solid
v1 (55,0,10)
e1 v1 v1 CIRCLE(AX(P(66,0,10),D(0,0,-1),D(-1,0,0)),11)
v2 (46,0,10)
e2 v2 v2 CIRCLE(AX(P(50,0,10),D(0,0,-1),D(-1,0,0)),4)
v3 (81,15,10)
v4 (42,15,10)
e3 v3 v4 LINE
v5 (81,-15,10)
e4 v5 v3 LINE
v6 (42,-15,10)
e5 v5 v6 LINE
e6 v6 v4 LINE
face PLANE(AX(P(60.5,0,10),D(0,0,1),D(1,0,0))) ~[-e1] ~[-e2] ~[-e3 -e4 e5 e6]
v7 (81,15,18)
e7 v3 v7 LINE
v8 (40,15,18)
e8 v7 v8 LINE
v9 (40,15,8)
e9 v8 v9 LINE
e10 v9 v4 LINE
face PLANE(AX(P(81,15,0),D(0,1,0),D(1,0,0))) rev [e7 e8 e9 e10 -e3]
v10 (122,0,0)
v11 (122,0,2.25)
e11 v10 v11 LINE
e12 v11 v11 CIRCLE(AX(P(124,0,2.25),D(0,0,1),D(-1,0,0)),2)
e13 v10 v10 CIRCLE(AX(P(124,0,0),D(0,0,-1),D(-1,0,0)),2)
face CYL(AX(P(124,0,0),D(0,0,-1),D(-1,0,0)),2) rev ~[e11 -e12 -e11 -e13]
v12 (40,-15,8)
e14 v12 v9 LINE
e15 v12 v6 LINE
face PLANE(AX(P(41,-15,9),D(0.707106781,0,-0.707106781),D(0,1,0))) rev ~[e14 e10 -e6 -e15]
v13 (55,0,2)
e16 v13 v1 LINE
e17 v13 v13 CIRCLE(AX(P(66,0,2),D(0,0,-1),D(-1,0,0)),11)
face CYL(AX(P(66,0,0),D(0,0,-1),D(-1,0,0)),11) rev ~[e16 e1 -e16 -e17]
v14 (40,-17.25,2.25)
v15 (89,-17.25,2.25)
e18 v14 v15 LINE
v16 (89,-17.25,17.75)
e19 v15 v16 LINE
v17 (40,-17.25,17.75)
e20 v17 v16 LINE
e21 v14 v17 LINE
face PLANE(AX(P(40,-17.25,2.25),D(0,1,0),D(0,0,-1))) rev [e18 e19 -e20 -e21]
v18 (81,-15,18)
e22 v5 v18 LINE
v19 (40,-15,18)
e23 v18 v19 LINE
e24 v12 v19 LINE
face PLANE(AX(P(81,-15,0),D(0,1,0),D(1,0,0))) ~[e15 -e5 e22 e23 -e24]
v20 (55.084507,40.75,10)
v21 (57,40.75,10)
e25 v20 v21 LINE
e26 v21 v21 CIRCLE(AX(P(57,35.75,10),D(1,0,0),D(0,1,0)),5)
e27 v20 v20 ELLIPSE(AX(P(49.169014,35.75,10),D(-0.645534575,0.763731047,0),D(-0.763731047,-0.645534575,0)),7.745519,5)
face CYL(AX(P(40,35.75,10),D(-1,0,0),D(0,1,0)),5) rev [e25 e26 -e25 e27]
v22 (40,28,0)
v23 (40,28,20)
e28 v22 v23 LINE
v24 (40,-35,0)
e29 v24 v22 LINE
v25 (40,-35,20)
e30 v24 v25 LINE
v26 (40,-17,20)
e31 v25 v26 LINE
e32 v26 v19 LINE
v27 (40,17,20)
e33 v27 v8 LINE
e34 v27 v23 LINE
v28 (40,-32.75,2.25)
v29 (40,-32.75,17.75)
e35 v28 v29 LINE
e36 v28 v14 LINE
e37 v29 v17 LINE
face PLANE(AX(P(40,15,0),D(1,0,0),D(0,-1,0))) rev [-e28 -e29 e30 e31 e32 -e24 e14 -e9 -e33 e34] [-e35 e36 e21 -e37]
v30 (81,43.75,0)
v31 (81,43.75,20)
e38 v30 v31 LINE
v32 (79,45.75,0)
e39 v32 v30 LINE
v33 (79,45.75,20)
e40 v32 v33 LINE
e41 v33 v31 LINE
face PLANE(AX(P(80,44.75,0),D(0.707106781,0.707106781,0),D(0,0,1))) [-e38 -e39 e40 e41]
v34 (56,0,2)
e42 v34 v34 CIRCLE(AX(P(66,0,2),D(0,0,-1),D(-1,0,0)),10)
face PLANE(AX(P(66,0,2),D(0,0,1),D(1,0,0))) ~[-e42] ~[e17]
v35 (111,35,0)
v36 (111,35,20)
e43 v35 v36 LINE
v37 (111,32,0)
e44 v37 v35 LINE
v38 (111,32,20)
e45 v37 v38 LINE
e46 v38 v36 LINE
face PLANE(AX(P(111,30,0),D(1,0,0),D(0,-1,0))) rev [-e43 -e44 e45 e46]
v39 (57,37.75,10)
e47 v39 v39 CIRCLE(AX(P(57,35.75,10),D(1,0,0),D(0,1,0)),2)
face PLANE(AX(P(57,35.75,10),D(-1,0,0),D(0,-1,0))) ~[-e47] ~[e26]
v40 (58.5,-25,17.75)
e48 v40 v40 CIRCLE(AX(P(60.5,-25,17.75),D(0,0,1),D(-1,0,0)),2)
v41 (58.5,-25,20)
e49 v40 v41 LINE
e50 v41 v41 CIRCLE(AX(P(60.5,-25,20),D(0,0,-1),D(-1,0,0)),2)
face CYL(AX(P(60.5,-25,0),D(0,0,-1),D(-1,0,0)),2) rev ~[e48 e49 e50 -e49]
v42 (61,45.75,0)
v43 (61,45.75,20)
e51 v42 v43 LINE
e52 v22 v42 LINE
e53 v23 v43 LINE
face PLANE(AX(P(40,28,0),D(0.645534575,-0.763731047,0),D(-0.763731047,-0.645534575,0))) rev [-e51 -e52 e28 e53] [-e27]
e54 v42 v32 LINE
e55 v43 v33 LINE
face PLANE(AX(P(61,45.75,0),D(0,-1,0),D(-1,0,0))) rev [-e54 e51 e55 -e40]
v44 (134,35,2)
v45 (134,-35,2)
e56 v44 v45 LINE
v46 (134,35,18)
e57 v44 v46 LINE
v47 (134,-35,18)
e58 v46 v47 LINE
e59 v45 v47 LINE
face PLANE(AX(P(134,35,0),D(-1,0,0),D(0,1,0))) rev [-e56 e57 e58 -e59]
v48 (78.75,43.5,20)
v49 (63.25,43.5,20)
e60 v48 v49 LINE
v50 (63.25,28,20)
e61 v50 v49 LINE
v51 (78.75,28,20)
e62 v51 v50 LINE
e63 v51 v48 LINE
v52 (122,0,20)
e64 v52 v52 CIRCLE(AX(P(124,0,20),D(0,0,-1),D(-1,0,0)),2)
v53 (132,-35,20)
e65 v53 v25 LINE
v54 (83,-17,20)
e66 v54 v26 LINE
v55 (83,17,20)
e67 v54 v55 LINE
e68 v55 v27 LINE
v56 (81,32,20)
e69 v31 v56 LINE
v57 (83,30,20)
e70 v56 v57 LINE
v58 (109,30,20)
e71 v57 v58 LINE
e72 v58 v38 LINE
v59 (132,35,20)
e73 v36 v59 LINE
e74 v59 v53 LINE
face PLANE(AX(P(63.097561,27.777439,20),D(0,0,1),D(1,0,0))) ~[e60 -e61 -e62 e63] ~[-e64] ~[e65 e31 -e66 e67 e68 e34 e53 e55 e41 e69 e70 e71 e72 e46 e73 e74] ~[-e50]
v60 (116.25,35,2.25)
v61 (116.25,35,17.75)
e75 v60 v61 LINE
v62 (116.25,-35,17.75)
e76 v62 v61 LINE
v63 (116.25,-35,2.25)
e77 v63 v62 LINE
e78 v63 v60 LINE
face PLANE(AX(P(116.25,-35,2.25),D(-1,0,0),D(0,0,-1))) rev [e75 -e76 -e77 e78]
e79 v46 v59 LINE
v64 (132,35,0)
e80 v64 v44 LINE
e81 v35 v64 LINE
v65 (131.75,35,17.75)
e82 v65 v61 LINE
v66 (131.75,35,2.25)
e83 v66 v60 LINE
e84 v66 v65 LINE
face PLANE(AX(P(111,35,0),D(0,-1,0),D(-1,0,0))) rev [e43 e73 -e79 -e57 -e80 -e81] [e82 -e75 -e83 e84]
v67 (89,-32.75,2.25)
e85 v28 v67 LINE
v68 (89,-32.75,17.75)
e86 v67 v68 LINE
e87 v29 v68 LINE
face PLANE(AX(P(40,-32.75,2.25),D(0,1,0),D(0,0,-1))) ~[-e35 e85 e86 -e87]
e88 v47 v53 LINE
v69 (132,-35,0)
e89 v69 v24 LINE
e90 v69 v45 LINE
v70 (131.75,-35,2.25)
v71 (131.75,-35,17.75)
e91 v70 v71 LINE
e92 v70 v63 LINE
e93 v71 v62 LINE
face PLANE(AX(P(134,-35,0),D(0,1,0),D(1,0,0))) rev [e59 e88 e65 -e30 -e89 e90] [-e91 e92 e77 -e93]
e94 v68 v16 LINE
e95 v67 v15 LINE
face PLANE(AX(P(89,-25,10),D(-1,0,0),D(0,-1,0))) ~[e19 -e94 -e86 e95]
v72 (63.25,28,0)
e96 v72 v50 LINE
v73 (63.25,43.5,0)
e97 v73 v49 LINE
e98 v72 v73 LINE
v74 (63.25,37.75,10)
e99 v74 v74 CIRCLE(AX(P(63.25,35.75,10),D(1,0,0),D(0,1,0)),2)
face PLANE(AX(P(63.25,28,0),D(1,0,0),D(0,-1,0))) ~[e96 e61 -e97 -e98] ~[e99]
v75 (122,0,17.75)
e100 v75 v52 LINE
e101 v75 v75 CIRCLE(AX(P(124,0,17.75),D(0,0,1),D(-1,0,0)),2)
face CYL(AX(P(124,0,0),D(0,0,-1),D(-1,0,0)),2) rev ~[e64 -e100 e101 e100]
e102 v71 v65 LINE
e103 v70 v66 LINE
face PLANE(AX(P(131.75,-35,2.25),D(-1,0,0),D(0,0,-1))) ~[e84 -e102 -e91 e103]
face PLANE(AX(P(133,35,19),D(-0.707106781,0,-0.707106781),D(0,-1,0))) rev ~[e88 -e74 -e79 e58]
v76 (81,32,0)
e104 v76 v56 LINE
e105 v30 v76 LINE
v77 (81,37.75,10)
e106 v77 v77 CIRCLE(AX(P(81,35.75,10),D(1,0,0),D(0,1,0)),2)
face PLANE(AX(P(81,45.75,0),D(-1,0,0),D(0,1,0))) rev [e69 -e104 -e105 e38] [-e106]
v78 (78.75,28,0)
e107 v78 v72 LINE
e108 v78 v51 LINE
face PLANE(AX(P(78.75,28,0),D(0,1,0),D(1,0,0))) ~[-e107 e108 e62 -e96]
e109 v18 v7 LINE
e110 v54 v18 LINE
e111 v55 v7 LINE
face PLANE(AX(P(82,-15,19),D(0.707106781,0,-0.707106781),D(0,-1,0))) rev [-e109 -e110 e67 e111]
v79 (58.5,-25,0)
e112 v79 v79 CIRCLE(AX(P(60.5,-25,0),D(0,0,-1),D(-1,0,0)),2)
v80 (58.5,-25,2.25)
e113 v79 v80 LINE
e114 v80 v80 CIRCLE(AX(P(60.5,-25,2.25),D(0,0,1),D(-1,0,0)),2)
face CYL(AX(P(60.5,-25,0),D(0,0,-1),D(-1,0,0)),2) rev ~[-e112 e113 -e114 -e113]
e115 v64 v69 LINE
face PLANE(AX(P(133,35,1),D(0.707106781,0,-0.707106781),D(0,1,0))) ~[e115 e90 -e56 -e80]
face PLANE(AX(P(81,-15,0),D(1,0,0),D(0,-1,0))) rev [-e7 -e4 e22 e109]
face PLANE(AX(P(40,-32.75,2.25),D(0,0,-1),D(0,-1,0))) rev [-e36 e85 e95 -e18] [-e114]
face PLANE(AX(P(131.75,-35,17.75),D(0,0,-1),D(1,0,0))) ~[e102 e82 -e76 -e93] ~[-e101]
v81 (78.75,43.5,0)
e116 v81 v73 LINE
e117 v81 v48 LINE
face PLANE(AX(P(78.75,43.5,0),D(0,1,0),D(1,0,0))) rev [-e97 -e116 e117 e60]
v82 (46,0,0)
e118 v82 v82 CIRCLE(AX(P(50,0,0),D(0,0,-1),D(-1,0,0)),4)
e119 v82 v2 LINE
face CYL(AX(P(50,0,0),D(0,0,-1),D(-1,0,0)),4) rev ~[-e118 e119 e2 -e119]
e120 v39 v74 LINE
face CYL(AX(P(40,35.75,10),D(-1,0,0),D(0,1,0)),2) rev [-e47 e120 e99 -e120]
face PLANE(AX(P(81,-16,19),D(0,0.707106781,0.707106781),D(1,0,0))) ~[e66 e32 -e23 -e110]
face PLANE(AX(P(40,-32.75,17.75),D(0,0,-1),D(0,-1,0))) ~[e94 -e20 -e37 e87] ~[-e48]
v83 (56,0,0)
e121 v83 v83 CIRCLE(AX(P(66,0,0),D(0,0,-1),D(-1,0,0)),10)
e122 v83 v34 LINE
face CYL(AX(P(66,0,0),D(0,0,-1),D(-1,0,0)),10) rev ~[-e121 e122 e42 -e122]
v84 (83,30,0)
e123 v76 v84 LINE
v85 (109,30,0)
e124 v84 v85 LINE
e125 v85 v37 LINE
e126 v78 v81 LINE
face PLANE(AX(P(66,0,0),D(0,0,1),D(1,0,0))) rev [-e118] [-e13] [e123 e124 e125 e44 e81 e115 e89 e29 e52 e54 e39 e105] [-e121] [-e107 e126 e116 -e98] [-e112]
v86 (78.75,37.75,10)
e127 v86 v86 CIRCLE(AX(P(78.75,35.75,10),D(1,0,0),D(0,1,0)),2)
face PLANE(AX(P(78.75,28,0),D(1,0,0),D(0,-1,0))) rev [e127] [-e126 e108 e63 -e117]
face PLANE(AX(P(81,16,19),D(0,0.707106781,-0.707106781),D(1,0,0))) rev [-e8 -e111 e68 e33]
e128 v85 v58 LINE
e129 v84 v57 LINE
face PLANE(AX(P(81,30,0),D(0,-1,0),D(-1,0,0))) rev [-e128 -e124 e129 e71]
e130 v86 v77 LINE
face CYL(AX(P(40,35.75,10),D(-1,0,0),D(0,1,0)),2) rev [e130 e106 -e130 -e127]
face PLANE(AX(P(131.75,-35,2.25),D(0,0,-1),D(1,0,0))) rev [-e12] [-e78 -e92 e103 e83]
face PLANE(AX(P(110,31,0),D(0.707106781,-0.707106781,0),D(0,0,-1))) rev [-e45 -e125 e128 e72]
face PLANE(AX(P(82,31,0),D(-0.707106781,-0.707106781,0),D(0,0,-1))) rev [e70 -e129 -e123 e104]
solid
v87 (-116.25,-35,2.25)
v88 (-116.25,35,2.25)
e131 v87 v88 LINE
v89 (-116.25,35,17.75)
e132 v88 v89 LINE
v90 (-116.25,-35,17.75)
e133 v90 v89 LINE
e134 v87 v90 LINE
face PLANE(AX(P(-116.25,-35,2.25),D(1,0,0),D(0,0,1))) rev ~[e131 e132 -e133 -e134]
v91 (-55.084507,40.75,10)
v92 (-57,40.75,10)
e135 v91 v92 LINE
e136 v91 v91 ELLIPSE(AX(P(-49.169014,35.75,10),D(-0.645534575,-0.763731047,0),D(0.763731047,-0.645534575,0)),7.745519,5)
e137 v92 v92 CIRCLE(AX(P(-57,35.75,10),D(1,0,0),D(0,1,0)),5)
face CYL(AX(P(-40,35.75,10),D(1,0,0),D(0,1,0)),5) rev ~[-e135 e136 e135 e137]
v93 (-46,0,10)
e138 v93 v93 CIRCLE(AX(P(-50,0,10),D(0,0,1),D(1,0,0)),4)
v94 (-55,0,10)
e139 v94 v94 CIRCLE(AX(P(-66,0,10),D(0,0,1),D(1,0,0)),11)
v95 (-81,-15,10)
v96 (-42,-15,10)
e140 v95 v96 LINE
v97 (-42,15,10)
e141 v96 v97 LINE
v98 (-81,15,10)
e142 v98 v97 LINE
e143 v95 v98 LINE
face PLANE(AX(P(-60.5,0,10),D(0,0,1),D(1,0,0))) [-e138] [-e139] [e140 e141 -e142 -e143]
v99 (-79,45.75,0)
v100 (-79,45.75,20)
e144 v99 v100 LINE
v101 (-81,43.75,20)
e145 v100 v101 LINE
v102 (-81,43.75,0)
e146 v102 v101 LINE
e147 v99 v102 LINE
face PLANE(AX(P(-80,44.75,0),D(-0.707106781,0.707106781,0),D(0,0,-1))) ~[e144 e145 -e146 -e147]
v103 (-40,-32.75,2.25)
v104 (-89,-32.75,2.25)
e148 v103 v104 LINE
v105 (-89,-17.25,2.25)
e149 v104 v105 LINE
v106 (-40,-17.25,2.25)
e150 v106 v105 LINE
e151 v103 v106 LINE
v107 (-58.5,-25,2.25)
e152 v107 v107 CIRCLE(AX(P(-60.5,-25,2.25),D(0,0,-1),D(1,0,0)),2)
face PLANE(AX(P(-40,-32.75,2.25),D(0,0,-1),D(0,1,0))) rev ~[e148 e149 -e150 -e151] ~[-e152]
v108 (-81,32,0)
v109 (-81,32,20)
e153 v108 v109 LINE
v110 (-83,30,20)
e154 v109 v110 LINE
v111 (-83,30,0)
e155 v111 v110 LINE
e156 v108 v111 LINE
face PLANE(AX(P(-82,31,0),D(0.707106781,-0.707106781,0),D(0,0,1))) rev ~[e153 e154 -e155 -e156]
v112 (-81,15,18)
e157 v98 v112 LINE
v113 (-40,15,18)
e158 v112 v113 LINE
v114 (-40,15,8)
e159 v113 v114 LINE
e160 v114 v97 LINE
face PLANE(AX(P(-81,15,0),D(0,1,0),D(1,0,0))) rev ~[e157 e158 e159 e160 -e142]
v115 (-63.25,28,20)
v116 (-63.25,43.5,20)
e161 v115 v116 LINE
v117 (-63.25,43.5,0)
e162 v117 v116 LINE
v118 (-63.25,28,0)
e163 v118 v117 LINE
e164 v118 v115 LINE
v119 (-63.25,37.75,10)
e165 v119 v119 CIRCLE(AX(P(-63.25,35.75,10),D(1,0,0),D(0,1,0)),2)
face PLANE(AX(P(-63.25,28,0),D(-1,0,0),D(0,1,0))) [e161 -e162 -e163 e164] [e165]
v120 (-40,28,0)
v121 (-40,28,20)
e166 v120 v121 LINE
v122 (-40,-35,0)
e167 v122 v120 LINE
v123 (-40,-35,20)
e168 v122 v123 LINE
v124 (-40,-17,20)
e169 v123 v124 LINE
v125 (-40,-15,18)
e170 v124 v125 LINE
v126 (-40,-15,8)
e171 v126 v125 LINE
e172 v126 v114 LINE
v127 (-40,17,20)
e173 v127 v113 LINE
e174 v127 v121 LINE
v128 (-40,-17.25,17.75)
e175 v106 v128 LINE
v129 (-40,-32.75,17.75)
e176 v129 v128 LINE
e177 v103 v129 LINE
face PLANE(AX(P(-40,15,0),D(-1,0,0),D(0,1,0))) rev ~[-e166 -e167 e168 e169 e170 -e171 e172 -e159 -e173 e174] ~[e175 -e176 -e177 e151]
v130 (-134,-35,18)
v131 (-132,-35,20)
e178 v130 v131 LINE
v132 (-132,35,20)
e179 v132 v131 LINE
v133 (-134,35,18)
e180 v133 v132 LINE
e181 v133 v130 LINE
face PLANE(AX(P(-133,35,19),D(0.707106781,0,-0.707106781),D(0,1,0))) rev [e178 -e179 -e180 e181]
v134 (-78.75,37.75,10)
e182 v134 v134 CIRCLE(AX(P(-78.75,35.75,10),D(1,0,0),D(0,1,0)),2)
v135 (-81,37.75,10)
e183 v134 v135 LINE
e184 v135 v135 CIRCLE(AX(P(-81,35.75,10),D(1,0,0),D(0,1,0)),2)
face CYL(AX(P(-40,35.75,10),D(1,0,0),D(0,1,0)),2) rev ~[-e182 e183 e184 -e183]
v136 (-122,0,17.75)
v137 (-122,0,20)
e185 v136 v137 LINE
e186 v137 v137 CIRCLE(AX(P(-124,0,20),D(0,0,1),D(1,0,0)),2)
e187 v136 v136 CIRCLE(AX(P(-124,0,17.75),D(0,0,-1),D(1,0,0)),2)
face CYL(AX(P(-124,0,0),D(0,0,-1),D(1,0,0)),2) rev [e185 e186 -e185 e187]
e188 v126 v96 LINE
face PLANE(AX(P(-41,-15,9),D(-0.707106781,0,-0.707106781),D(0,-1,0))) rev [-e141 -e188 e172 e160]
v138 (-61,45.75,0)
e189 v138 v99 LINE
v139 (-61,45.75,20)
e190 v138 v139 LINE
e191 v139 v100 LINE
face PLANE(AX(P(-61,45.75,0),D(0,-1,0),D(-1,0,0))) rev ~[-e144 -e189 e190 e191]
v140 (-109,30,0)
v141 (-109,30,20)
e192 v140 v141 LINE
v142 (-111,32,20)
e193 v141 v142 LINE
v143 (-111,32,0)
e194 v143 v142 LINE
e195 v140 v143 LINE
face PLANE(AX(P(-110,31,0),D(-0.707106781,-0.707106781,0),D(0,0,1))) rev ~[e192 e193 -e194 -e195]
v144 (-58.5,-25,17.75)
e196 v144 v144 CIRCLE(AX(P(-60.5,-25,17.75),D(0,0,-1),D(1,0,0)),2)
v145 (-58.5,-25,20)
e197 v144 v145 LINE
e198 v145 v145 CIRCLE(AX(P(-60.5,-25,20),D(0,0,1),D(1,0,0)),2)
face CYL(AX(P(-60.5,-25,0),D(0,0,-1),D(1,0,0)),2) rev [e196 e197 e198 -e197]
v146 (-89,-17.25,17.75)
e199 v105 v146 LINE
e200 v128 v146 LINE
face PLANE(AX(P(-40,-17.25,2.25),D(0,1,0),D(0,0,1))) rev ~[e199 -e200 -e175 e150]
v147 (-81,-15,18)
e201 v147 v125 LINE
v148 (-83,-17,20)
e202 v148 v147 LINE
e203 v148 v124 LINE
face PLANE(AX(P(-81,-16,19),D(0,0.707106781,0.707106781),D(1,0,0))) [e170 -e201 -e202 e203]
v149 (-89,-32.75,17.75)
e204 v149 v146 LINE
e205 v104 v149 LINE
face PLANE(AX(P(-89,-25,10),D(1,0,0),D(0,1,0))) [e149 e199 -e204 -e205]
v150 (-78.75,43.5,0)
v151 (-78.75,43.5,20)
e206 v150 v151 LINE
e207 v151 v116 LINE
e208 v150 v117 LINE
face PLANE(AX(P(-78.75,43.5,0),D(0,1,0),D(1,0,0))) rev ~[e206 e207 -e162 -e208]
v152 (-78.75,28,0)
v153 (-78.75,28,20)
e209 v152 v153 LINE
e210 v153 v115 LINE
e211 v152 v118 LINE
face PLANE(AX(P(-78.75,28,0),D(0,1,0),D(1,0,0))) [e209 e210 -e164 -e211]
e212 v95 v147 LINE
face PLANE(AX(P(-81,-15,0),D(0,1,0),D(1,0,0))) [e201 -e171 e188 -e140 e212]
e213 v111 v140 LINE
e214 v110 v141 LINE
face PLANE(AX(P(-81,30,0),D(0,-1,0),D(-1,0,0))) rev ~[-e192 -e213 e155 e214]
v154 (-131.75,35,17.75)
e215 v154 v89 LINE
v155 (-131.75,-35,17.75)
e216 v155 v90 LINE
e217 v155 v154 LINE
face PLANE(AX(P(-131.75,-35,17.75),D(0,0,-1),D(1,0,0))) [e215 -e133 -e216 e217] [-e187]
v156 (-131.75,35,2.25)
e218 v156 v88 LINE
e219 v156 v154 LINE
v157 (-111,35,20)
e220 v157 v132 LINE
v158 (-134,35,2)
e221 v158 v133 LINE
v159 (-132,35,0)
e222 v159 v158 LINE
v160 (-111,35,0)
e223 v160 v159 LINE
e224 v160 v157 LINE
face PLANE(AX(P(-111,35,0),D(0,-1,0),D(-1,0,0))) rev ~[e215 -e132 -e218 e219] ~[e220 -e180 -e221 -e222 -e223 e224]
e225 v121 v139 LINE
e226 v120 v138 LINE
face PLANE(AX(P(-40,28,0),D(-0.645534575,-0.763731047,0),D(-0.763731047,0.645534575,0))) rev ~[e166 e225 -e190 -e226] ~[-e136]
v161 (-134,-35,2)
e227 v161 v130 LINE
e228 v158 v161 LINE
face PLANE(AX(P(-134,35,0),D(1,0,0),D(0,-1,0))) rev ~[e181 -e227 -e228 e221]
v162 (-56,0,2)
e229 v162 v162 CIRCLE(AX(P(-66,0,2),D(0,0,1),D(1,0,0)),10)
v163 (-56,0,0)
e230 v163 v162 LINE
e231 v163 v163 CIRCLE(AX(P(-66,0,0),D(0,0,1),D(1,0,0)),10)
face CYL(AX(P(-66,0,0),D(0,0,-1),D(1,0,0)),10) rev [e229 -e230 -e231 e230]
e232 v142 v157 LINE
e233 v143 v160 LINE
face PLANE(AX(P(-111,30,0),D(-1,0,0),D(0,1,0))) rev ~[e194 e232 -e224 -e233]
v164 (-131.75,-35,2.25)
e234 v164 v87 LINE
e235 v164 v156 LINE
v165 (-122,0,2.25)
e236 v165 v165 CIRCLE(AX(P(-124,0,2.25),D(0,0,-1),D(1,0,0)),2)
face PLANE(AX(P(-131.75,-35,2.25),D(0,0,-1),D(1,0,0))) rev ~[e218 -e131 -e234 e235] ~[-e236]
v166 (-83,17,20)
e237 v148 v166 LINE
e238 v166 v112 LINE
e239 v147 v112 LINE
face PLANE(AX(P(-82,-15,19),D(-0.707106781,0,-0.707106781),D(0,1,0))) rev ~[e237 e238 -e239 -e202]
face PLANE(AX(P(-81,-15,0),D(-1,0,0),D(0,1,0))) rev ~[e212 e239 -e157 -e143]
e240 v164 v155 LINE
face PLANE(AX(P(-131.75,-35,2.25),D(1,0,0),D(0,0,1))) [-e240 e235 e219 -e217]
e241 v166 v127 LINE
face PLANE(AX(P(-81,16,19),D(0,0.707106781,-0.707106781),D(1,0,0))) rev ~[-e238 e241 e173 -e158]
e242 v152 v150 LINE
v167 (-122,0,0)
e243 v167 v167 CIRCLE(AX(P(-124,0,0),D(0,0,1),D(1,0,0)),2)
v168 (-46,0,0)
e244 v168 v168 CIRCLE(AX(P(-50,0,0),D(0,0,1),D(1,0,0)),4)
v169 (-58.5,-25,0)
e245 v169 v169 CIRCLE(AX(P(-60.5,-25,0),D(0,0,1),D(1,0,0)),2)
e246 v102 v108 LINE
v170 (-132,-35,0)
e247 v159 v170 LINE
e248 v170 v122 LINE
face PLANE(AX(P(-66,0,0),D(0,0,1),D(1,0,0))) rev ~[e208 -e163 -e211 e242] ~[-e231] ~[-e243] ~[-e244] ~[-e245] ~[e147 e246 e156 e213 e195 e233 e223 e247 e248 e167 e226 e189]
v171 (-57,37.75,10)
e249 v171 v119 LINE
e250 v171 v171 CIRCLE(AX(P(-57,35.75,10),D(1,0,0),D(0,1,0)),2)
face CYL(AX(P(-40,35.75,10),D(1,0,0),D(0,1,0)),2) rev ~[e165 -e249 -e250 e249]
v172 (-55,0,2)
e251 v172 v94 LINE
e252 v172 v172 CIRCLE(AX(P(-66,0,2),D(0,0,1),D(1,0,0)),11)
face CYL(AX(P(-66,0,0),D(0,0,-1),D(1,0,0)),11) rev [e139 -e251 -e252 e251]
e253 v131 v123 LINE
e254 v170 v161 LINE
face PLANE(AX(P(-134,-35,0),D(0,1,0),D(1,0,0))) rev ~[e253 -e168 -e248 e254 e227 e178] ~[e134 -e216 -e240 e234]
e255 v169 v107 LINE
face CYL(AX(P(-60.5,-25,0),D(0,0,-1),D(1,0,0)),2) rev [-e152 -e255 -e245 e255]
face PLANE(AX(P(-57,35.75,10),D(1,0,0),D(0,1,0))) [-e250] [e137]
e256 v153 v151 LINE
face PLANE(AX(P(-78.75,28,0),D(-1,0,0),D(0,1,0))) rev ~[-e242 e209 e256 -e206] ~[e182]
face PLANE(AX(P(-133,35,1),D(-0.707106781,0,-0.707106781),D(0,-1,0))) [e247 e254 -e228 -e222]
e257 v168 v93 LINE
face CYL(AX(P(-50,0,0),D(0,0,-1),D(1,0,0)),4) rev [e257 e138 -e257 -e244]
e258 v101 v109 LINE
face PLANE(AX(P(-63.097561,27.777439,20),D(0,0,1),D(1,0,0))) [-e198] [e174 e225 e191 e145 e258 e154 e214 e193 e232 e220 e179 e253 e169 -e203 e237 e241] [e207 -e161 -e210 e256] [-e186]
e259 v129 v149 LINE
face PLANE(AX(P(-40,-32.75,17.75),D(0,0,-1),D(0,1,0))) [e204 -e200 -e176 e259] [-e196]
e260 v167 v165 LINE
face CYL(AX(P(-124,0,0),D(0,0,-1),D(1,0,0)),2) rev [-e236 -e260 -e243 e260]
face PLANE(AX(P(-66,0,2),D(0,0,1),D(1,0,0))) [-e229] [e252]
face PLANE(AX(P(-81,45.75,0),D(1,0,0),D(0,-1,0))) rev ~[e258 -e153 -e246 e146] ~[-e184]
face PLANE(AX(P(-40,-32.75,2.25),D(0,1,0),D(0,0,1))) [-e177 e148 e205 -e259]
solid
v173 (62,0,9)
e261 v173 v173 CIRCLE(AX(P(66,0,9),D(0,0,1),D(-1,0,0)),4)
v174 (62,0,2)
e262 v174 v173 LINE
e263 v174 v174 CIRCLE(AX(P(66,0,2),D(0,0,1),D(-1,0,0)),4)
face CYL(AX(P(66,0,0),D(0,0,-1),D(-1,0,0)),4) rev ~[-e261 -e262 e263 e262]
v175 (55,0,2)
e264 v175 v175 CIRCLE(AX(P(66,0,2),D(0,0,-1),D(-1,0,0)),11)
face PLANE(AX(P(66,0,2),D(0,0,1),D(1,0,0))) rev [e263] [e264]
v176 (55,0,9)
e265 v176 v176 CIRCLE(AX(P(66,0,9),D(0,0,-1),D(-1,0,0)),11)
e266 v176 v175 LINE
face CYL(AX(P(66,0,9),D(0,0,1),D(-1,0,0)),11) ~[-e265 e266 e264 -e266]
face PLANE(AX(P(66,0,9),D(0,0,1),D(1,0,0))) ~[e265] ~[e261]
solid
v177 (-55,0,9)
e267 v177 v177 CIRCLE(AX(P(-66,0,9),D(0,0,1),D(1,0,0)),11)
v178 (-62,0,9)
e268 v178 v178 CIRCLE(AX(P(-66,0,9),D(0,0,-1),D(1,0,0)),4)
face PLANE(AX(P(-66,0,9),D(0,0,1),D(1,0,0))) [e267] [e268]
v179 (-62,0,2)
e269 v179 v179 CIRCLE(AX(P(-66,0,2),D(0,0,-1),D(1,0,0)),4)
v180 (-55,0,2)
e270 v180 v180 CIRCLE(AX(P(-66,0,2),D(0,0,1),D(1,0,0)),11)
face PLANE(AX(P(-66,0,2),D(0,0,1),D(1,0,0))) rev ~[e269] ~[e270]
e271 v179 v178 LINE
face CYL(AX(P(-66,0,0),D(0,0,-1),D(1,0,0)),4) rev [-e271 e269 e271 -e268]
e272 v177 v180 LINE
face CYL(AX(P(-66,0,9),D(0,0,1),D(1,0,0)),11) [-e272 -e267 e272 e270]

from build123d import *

# Parameters (mm, degrees)
F0_W      = 41
F0_H      = 30
F0_R      = 11
F0_R_2    = 4
F1_DEPTH  = 10
F0_W_2    = 15.5
F0_H_2    = 15.5
F0_H_3    = 20
F0_R_3    = 2
F2_DEPTH  = 20
F0_R_4    = 10
F3_DEPTH  = 2
F4_W      = 15.5
F4_H      = 15.5
F5_DEPTH  = 49
F7_START  = -1
F6_R      = 11
F7_DEPTH  = 7
F8_DEPTH  = 25
F9_W      = 15.5
F9_H      = 15.5
F10_DEPTH = 80.751
F11_SIZE  = 2
F12_R     = 5
F12_R_2   = 2
F13_DEPTH = 17
F14_DEPTH = 41


# Not quite as in the source:
# - a feature names something its author has since deleted; it is built from what else it names


with BuildPart() as f1:
    # F0 (on Top) → F1 (new body)
    with BuildSketch(Plane.XY):
        with Locations((-60.5, 0)):
            Rectangle(F0_W, F0_H)
        with Locations((-66, 0)):
            Circle(F0_R, mode=Mode.SUBTRACT)
        with Locations((-50, 0)):
            Circle(F0_R_2, mode=Mode.SUBTRACT)
    extrude(amount=F1_DEPTH)

    # F0 (on Top) → F2 (join)
    with BuildSketch(Plane.XY):
        Polygon((-81, 30), (-81, 15), (-40, 15), (-40, 28), (-61, 28), (-61, 45.75), (-81, 45.75), (-81, 35), align=None)
        with Locations((-71, 35.75)):
            Rectangle(F0_W_2, F0_H_2, mode=Mode.SUBTRACT)
        with Locations((-60.5, -25)):
            Rectangle(F0_W, F0_H_3)
        with Locations((-60.5, -25)):
            Circle(F0_R_3, mode=Mode.SUBTRACT)
        Polygon((-81, -15), (-81, 15), (-81, 30), (-111, 30), (-111, 35), (-134, 35), (-134, -35), (-81, -35), align=None)
        with Locations((-124, 0)):
            Rectangle(F0_W_2, F0_H_2, mode=Mode.SUBTRACT)
        with Locations((-124, 0)):
            Rectangle(F0_W_2, F0_H_2)
        with Locations((-124, 0)):
            Circle(F0_R_3, mode=Mode.SUBTRACT)
        Polygon((-61, 28), (-40, 28), (-61, 45.75), align=None)
    extrude(amount=F2_DEPTH)

    # F0 (on Top) → F3 (join)
    with BuildSketch(Plane.XY):
        with Locations((-66, 0)):
            Circle(F0_R)
        with Locations((-66, 0)):
            Circle(F0_R_4, mode=Mode.SUBTRACT)
    extrude(amount=F3_DEPTH)

    # F4 (on face) → F5 (cut)
    with BuildSketch(Plane.YZ.offset(-40)):
        with Locations((-25, 10)):
            Rectangle(F4_W, F4_H)
    extrude(amount=-F5_DEPTH, mode=Mode.SUBTRACT)

    # F9 (on face) → F10 (cut, through all)
    with BuildSketch(Plane.XZ.offset(35)):
        with Locations((-124, 10)):
            Rectangle(F9_W, F9_H)
    extrude(amount=-F10_DEPTH, mode=Mode.SUBTRACT)

    # F11
    f11_edges = [f1.edges().sort_by_distance(p)[0] for p in [
        (-81, 0, 20),
        (-60.5, 15, 20),
        (-60.5, -15, 20),
        (-134, 0, 20),
        (-134, 0, 0),
        (-40, 0, 10),
        (-111, 30, 10),
        (-81, 30, 10),
        (-81, 45.75, 10),
    ]]
    chamfer(f11_edges, length=F11_SIZE)

    # F12 (on face) → F13 (cut)
    with BuildSketch(Plane.YZ.offset(-40)):
        with Locations((35.75, 10)):
            Circle(F12_R)
        with Locations((35.75, 10)):
            Circle(F12_R_2, mode=Mode.SUBTRACT)
    extrude(amount=-F13_DEPTH, mode=Mode.SUBTRACT)

    # F12 (on face) → F14 (cut)
    with BuildSketch(Plane.YZ.offset(-40)):
        with Locations((35.75, 10)):
            Circle(F12_R_2)
    extrude(amount=-F14_DEPTH, mode=Mode.SUBTRACT)


with BuildPart() as f7:
    # F6 (on face) → F7 (new body)
    with BuildSketch(Plane.XY.offset(10).offset(F7_START)):
        with Locations((-66, 0)):
            Circle(F6_R)
    extrude(amount=-F7_DEPTH)

    # F0 (on Top) → F8 (cut)
    with BuildSketch(Plane.XY):
        with Locations((-66, 0)):
            Circle(F0_R_2)
    extrude(amount=F8_DEPTH, mode=Mode.SUBTRACT)


with BuildPart() as f15_1:
    # F15: instance of F7
    add(f7.part.mirror(Plane.YZ))


with BuildPart() as f15_2:
    # F15: instance of F1
    add(f1.part.mirror(Plane.YZ))


solid = Compound([f1.part, f7.part, f15_1.part, f15_2.part])
